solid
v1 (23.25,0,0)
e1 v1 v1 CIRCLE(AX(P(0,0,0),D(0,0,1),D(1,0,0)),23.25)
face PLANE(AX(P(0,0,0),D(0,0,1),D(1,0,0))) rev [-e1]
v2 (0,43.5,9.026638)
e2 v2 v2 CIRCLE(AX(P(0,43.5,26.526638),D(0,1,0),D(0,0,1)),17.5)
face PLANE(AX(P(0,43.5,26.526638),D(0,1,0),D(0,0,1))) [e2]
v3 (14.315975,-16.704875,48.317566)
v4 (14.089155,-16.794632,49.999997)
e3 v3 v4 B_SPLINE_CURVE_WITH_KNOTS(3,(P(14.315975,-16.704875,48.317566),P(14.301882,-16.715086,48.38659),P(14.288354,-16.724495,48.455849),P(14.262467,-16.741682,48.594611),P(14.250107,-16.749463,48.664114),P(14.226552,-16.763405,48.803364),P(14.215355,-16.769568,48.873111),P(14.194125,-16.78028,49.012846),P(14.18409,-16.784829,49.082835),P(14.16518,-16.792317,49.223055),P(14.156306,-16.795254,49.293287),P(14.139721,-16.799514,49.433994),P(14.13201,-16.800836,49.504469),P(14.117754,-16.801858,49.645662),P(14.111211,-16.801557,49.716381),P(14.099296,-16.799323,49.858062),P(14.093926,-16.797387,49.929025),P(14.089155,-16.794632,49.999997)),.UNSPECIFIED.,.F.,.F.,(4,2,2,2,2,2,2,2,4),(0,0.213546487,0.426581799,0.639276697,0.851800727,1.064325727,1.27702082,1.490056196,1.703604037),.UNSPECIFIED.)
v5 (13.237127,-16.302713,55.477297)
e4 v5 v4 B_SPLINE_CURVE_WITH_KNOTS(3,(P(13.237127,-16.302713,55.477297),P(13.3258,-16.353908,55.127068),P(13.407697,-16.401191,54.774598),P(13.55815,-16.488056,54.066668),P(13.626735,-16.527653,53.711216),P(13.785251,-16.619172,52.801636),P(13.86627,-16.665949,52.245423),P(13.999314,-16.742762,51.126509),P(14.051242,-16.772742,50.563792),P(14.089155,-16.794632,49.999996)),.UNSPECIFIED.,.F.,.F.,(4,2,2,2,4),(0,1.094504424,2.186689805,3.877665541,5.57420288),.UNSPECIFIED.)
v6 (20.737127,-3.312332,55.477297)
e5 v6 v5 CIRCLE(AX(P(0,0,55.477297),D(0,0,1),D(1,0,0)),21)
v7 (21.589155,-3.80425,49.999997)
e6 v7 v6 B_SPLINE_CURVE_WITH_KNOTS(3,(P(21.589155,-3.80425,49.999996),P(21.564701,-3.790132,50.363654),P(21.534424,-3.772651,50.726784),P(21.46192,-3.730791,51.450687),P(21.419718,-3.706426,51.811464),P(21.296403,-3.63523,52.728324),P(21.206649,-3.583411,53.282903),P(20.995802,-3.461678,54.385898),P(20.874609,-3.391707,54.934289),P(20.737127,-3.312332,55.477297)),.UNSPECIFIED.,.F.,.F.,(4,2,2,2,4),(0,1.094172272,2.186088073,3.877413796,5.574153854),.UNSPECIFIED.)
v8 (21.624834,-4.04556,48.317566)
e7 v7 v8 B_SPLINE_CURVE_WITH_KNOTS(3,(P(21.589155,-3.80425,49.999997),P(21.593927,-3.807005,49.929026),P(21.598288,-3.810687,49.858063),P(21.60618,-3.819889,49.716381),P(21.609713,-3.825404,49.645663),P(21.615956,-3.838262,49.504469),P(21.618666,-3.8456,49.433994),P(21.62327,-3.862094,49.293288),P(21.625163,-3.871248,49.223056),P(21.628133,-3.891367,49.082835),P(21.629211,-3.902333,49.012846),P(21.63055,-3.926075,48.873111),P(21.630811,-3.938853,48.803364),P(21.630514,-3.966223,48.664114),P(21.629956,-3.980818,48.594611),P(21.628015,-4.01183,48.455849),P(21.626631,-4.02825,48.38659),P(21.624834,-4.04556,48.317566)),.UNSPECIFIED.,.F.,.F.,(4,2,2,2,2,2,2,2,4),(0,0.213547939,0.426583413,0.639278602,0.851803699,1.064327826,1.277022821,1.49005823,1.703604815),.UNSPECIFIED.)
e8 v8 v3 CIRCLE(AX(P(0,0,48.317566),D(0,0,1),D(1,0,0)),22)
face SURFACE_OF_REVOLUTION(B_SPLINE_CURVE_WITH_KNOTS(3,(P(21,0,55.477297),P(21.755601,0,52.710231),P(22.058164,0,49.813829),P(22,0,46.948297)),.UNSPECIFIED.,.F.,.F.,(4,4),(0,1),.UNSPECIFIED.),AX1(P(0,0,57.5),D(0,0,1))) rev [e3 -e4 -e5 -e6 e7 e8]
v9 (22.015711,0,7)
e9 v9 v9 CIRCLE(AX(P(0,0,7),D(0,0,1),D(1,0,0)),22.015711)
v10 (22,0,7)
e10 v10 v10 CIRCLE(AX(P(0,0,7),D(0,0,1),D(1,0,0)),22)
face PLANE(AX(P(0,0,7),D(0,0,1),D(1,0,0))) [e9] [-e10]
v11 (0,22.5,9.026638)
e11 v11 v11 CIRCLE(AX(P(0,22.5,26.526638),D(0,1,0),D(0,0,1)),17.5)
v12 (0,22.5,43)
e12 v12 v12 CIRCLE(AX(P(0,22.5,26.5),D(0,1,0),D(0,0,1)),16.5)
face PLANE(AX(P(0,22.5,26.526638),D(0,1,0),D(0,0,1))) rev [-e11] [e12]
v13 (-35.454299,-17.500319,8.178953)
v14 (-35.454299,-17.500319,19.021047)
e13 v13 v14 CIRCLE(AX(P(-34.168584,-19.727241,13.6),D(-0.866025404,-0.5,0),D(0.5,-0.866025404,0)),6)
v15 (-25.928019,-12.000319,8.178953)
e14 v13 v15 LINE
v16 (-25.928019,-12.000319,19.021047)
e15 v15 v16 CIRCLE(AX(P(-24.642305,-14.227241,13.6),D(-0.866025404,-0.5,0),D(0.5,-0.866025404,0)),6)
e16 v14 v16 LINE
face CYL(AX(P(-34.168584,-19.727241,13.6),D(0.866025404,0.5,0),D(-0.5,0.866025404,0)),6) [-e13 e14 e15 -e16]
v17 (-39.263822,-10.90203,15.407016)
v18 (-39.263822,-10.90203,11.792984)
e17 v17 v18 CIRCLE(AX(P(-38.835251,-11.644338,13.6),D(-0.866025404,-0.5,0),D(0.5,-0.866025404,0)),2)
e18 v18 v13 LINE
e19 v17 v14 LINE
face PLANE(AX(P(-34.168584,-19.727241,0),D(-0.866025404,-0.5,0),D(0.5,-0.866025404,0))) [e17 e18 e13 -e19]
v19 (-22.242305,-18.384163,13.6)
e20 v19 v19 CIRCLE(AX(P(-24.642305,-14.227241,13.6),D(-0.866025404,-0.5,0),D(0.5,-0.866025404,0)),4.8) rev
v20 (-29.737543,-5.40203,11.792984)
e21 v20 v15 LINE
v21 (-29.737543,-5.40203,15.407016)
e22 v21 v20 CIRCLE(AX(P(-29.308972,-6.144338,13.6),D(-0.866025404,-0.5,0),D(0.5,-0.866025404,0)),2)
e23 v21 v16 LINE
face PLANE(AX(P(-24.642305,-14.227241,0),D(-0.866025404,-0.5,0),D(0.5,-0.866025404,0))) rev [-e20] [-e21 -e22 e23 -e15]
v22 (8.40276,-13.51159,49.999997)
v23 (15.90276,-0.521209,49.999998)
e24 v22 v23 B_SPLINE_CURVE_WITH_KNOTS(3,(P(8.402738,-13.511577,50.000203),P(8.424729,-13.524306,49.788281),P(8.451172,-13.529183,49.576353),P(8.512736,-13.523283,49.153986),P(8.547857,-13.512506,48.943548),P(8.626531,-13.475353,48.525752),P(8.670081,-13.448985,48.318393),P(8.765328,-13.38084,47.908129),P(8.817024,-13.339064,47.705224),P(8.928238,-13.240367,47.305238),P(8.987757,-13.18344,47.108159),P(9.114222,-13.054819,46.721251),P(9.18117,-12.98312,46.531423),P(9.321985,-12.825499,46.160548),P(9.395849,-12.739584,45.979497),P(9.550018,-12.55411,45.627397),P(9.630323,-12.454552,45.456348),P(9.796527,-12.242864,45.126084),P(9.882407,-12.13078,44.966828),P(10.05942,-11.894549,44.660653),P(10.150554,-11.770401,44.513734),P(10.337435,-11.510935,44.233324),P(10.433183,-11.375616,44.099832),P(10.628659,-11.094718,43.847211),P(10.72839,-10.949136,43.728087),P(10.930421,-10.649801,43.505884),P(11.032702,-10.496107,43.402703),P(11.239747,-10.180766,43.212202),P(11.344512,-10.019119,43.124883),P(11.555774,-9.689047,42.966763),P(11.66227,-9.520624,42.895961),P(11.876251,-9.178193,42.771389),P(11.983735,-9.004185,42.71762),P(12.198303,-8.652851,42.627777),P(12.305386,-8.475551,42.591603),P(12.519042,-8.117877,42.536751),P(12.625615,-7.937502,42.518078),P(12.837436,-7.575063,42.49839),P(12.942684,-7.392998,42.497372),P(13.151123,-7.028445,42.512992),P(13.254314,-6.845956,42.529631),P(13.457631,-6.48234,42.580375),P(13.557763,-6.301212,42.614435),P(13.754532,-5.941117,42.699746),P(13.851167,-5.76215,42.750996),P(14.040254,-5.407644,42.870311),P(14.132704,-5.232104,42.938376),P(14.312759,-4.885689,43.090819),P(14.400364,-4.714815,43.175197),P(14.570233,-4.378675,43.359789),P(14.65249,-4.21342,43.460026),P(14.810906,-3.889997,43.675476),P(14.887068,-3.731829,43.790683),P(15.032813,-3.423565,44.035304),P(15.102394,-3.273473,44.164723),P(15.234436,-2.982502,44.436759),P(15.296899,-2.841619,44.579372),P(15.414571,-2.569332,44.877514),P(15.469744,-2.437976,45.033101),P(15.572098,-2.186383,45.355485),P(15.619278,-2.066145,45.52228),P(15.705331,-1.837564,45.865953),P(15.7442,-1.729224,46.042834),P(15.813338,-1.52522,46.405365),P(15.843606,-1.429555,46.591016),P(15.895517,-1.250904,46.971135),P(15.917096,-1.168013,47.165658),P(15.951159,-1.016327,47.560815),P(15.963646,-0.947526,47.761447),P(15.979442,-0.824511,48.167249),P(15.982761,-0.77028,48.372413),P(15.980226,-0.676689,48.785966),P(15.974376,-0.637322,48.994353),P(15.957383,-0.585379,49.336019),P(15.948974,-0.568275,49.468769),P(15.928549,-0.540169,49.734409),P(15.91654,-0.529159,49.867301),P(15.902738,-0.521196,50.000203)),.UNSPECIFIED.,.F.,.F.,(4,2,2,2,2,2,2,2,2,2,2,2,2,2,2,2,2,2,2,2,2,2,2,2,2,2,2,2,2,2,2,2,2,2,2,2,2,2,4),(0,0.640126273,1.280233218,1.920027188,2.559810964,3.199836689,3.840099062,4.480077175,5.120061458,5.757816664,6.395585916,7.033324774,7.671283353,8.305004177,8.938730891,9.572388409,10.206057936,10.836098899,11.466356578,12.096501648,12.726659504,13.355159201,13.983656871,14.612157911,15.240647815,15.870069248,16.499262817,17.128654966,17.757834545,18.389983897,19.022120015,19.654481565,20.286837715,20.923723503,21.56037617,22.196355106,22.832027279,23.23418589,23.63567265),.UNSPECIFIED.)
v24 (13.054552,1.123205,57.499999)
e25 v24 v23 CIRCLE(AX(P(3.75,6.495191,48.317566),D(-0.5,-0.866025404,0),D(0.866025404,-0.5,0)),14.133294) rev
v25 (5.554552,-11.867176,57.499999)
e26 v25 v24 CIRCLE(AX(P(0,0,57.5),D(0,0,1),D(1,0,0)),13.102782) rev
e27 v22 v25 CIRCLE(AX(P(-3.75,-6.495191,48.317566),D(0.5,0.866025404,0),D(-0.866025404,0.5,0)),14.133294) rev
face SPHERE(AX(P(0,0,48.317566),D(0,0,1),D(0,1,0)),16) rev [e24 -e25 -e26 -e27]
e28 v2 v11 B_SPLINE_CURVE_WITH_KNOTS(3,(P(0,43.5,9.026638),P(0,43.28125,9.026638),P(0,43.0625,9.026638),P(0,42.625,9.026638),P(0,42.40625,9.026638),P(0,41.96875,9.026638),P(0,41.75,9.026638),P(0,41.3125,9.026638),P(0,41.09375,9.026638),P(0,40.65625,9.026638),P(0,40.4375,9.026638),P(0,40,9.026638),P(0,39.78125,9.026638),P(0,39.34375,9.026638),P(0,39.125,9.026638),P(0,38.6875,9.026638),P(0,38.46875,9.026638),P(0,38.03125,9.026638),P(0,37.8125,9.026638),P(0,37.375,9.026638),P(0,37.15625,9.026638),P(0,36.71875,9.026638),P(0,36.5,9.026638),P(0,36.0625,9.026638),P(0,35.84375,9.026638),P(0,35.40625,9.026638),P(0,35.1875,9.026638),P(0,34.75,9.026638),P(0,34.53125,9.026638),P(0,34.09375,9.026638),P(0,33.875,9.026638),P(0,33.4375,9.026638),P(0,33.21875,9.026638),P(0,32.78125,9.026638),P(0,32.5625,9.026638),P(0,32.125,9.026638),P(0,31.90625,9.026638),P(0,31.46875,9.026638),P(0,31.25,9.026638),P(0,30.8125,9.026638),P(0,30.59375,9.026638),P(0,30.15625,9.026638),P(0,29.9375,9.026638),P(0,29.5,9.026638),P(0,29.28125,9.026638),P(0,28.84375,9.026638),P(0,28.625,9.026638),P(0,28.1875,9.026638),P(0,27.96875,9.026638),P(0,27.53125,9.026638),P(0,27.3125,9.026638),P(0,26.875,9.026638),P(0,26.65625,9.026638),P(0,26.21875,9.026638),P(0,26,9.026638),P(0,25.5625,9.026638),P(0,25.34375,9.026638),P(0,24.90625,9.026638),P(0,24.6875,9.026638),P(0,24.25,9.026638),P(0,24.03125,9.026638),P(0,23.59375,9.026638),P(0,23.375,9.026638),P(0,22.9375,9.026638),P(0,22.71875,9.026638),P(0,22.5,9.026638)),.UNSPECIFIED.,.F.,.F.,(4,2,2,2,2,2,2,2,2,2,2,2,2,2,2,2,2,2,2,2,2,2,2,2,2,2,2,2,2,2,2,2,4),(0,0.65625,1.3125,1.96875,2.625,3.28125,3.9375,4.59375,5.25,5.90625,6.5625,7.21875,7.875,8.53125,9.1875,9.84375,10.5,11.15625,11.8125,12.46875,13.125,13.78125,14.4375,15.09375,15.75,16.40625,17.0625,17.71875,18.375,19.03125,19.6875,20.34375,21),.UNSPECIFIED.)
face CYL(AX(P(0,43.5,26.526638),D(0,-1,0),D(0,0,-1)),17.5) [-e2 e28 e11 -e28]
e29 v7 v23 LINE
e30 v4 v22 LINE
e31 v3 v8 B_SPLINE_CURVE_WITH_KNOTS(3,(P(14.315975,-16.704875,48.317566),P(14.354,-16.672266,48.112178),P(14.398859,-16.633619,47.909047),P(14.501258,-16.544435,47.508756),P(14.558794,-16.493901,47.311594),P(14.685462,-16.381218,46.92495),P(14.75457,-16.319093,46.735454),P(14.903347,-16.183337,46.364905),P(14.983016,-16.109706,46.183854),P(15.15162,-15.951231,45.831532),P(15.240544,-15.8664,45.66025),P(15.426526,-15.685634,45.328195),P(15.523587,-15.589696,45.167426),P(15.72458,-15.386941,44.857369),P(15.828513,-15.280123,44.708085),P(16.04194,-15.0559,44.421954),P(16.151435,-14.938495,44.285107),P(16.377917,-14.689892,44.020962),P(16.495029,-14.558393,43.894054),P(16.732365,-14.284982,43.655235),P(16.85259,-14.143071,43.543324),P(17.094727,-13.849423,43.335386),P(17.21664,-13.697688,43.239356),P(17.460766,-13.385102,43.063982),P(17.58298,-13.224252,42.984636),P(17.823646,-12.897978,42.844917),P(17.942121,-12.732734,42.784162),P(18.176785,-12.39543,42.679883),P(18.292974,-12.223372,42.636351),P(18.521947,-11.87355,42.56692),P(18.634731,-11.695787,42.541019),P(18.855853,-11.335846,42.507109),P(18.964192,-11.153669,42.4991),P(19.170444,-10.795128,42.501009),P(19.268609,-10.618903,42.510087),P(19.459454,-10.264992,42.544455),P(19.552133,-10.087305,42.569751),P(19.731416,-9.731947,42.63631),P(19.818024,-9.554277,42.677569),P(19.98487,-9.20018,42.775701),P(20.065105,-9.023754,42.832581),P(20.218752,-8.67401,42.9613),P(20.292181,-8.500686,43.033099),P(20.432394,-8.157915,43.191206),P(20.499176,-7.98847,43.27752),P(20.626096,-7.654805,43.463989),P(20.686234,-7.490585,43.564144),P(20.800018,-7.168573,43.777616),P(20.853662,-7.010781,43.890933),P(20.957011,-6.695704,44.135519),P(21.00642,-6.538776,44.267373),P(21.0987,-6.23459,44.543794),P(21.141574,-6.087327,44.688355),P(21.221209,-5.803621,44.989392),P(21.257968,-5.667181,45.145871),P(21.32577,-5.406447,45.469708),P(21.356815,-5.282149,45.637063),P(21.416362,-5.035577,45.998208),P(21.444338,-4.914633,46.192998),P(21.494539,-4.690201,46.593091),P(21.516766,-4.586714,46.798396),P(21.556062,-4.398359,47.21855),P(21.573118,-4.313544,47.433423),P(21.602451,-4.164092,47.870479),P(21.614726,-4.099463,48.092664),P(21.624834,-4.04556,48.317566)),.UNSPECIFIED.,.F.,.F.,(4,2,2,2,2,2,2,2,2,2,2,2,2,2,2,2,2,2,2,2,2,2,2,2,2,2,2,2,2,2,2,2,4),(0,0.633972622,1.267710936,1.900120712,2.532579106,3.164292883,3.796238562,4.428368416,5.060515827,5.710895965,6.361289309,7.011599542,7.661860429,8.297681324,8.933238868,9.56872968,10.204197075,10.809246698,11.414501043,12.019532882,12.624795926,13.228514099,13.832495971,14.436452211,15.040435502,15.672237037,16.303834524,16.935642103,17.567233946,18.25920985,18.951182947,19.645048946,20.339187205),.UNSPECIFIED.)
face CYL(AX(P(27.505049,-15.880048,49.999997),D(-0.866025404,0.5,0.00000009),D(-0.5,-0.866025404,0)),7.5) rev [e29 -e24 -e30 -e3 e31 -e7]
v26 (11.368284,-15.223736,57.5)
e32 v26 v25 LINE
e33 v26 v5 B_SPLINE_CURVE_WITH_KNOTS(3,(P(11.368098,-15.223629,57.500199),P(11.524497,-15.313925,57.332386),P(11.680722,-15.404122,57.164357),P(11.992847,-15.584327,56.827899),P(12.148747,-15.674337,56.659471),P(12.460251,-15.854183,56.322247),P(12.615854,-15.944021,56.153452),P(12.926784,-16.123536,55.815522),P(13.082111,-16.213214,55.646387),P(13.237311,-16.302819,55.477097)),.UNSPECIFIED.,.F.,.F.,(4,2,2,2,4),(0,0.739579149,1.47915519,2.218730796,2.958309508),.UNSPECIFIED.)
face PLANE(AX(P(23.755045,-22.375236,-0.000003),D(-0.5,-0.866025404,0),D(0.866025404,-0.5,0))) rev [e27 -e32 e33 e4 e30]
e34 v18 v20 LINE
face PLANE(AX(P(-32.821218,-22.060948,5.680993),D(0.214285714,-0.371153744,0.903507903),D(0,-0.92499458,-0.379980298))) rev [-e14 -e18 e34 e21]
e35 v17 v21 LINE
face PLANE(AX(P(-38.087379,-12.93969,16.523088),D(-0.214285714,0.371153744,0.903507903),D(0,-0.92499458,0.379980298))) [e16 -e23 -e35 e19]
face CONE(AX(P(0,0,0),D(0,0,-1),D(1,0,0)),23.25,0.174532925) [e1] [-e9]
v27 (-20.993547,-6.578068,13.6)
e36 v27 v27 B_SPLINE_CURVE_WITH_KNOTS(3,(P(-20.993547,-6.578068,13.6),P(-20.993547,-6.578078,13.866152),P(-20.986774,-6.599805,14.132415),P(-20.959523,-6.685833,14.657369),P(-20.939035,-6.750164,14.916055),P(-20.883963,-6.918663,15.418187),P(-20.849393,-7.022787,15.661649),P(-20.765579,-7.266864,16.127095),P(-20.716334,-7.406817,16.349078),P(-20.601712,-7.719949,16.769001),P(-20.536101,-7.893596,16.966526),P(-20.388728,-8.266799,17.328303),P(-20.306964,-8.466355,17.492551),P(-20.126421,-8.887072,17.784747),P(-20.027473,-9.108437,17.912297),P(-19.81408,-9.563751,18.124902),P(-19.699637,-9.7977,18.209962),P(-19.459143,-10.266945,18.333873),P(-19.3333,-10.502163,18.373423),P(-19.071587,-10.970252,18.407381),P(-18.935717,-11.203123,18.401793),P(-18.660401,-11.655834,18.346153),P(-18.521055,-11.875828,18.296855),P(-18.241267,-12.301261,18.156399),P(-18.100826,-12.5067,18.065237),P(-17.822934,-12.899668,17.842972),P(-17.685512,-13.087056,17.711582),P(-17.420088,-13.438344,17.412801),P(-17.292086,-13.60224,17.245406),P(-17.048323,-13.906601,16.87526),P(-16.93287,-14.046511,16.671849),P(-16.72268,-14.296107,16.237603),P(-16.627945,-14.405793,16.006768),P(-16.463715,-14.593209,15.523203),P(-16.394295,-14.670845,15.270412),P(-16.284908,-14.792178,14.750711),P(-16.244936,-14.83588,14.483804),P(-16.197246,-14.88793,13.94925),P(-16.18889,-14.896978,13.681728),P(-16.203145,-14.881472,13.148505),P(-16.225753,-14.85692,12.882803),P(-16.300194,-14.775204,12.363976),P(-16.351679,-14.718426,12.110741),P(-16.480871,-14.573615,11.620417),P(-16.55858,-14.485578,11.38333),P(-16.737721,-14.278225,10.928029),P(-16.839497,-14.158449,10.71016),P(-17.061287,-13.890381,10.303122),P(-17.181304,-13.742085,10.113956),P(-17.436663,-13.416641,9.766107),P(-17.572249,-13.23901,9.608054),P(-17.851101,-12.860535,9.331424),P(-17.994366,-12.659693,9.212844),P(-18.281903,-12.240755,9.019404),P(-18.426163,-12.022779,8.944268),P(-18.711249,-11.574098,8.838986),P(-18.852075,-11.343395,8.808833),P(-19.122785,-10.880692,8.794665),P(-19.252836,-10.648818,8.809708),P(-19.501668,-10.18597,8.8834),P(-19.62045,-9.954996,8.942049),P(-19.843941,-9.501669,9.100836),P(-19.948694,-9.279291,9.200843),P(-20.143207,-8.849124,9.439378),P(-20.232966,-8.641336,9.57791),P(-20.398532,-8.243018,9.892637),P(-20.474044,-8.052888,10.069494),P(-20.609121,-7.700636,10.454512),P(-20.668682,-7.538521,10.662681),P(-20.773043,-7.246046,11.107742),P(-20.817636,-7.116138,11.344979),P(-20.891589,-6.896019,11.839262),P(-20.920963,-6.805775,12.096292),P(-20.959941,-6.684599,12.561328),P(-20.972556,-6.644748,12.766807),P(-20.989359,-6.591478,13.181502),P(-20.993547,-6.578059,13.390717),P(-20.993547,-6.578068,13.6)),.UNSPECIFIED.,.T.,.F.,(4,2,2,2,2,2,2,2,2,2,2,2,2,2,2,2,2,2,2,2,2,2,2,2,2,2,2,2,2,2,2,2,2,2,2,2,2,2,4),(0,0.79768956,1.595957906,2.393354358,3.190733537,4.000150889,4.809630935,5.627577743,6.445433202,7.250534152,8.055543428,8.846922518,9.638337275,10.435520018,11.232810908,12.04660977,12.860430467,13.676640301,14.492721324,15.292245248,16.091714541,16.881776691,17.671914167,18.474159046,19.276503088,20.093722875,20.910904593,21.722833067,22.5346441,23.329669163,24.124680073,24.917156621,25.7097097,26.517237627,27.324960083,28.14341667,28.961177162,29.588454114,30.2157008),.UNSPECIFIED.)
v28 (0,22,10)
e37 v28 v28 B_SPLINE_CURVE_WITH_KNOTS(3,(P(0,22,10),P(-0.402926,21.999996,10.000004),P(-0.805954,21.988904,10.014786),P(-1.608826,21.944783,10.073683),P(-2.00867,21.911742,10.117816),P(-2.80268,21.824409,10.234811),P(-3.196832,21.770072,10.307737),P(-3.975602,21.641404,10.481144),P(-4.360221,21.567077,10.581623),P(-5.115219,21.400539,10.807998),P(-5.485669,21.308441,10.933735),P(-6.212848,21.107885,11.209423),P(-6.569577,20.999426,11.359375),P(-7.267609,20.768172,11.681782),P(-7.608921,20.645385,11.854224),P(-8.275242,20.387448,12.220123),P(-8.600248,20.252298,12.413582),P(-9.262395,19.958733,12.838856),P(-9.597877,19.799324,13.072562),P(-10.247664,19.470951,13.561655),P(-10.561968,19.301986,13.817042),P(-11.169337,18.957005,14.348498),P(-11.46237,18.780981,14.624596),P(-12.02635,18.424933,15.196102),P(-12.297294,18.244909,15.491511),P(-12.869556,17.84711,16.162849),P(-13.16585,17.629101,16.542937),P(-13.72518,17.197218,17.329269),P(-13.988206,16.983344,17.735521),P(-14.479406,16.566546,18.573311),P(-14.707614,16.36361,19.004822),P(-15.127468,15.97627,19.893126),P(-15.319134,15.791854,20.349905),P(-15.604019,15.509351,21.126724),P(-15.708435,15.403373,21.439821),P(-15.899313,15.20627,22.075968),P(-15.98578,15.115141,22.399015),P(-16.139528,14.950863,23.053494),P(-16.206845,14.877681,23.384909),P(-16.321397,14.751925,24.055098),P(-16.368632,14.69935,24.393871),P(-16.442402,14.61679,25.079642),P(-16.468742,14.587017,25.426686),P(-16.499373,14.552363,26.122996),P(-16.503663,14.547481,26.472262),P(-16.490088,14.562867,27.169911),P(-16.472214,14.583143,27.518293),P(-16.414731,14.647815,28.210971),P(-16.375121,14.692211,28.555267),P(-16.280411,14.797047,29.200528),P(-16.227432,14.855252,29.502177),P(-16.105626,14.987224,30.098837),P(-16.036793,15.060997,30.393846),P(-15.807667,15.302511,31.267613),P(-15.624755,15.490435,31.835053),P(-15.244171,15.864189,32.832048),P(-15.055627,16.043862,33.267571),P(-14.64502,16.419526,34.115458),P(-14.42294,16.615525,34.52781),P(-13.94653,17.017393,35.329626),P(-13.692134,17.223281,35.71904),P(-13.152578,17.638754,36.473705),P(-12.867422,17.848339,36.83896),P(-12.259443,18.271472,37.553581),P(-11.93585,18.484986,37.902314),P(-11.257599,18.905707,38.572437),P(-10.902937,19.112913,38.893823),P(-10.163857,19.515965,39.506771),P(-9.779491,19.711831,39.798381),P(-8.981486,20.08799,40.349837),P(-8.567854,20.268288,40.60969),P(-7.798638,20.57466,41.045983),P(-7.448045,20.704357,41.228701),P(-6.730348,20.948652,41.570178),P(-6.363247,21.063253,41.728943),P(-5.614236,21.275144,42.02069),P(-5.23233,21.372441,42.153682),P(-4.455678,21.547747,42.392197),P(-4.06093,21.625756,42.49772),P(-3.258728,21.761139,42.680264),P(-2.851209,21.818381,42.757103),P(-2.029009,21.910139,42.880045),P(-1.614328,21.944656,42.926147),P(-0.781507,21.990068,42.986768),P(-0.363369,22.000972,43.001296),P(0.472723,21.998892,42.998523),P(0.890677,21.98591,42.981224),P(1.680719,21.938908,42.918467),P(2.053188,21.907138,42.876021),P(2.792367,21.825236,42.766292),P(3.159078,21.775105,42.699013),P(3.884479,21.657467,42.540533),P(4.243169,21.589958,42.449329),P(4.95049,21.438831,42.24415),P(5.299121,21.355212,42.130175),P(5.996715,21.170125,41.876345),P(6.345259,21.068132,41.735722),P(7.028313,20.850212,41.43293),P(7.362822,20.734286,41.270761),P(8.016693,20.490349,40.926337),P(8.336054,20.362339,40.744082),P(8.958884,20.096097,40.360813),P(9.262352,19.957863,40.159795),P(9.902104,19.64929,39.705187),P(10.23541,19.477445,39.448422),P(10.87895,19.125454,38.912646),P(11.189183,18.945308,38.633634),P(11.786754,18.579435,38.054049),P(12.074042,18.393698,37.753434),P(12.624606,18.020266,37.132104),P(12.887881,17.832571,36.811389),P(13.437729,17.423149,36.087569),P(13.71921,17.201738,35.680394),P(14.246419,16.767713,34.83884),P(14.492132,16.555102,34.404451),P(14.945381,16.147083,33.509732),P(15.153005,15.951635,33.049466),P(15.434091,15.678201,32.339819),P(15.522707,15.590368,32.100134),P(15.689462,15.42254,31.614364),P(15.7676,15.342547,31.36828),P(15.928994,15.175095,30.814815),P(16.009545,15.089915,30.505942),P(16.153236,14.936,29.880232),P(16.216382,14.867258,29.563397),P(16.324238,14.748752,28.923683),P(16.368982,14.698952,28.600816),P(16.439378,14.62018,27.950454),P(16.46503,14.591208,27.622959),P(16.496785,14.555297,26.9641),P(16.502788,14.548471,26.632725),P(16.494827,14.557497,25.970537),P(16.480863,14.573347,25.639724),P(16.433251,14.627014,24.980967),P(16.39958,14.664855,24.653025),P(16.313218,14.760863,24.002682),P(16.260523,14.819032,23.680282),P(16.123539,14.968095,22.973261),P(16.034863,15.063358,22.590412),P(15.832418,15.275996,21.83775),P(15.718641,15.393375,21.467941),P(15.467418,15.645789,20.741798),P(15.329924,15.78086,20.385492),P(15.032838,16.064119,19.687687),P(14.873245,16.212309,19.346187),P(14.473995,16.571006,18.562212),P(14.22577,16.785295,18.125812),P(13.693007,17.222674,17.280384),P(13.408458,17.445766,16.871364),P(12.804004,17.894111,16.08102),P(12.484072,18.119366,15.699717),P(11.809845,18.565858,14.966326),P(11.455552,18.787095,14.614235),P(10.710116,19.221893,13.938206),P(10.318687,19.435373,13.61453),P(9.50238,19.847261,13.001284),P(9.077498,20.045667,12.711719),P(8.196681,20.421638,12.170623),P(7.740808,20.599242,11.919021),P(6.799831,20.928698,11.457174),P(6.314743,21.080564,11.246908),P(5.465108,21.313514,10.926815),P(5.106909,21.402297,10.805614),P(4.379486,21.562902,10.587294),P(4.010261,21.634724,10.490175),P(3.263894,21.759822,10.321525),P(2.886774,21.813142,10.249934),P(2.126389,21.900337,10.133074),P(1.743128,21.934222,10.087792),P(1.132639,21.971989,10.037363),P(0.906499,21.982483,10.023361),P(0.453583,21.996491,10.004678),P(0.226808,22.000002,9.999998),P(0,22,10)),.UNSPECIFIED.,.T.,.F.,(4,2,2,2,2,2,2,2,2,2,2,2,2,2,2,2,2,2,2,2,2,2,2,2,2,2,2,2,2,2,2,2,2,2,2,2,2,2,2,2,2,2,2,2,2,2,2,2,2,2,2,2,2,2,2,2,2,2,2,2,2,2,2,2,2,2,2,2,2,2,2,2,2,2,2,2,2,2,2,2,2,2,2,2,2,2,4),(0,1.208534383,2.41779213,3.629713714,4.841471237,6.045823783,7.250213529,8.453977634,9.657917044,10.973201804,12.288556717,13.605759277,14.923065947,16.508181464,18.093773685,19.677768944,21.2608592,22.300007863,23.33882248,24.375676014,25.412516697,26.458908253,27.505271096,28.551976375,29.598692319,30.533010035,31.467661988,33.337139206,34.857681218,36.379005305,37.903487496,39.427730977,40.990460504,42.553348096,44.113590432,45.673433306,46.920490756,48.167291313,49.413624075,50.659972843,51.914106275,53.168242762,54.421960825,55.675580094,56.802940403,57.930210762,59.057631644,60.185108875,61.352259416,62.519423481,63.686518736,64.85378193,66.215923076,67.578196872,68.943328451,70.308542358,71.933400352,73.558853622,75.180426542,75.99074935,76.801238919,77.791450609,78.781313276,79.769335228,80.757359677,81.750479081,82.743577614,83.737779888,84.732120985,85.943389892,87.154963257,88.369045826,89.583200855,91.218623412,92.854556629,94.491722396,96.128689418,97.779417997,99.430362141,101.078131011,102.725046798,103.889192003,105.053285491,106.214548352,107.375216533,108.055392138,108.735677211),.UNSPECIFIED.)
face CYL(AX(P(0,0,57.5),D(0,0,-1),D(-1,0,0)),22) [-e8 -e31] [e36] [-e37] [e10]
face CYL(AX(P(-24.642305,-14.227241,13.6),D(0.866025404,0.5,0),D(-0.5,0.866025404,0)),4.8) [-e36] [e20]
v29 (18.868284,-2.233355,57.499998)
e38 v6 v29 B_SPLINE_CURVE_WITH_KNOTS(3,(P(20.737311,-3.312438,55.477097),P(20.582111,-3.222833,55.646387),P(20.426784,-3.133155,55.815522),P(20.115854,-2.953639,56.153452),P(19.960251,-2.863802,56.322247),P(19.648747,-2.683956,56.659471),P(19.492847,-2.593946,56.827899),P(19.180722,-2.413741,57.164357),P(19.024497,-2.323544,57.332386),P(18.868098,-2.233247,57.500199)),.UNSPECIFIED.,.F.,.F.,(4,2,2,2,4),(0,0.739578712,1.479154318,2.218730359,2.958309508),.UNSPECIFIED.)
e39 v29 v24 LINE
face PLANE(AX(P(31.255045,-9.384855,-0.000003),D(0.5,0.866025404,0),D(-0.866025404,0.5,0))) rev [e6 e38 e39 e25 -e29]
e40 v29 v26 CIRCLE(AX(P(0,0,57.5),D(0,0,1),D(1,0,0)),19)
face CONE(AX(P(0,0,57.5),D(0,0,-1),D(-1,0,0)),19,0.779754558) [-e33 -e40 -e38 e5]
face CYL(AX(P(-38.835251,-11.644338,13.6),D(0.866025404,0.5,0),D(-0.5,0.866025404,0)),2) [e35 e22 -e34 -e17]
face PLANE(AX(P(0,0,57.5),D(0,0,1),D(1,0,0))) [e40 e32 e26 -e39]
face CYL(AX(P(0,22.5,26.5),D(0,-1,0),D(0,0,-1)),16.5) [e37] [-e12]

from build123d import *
from OCP.BRepAlgoAPI import BRepAlgoAPI_Cut
from OCP.TopTools import TopTools_ListOfShape

# Parameters (mm, degrees)
SKETCH_1_R          = 23.25
EXTRUDE_1_DEPTH     = 7
EXTRUDE_1_TAPER     = 10
SKETCH_2_R          = 22
EXTRUDE_2_DEPTH     = 50.5
SKETCH_4_R          = 16.5
EXTRUDE_3_DEPTH     = 22.5
SKETCH_6_R          = 17.5
EXTRUDE_4_DEPTH     = 21
CUT_EXTRUDE_START   = -5.710511326
CUT_EXTRUDE_1_DEPTH = 12.710511326
SKETCH_10_R         = 4.8
EXTRUDE_5_DEPTH     = 12
EXTRUDE_6_DEPTH     = 11


with BuildPart() as part:
    # 草图1 → 凸台-拉伸1 (new body)
    with BuildSketch(Plane.XY):
        Circle(SKETCH_1_R)
    extrude(amount=EXTRUDE_1_DEPTH, taper=EXTRUDE_1_TAPER)

    # 草图2 → 凸台-拉伸2 (add)
    with BuildSketch(Plane.XY.offset(7)):
        Circle(SKETCH_2_R)
    extrude(amount=EXTRUDE_2_DEPTH)

    # 草图3 → 切除-旋转1 (revolve, cut)
    with BuildSketch(Plane(origin=(0, 0, 0), x_dir=(1, 0, 0), z_dir=(0, 1, 0))):
        with BuildLine():
            Line((21, -55.477297211), (22, -55.477297211))
            Line((22, -55.477297211), (22, -48.317565939))
            add(Edge.make_bspline(
                [(21, -55.477297211), (21.635397746, -53.150423877), (21.950433845, -50.732091094), (22, -48.317565939)],
                knots=[0, 0, 0, 0, 0.840917251, 0.840917251, 0.840917251, 0.840917251], degree=3))
        make_face()
        Polygon((19, -57.5), (22, -57.5), (22, -55.477297211), (21, -55.477297211), align=None)
    revolve(axis=Axis((0, 0, 57.5), (0, 0, -1)), mode=Mode.SUBTRACT)

    # 草图4 → 凸台-拉伸3 (add)
    with BuildSketch(Plane(origin=(0, 0, 0), x_dir=(1, 0, 0), z_dir=(0, 1, 0))):
        with Locations(Location((0, -26.5, 0), (0, 0, 90))):
            Circle(SKETCH_4_R)
    extrude(amount=EXTRUDE_3_DEPTH)

    # 草图6 → 凸台-拉伸4 (add)
    with BuildSketch(Plane(origin=(0, 22.5, 0), x_dir=(1, 0, 0), z_dir=(0, 1, 0))):
        with Locations(Location((0, -26.526637771, 0), (0, 0, 90))):
            Circle(SKETCH_6_R)
    extrude(amount=EXTRUDE_4_DEPTH)

    # 草图7 → 切除-旋转2 (revolve, cut)
    with BuildSketch(Plane(origin=(0, 0, 0), x_dir=(0, 0, -1), z_dir=(1, 0, 0))):
        with BuildLine():
            Line((-64.317565939, 0), (-32.317565939, 0))
            ThreePointArc((-32.317565939, 0), (-48.317565939, 16), (-64.317565939, 0))
        make_face()
    revolve(axis=Axis((0, 0, 57.5), (0, 0, -1)), mode=Mode.SUBTRACT)


with BuildPart() as cut_extrude_1_tool:
    # 切除-拉伸1: read off the stored shape, not the designer's step
    # 切除-拉伸1 outline → 切除-拉伸1 (new body)
    with BuildSketch(Plane(origin=(14.249995527, -8.227238754, -1.478e-06), x_dir=(0.49999999999999495, 0.8660254037844416, 0), z_dir=(0.8660254037844382, -0.49999999999999295, -8.981993465039313e-08)).offset(CUT_EXTRUDE_START)):
        with BuildLine():
            ThreePointArc((-7.5, 49.99999845), (3.87e-07, 42.5), (7.5, 49.999999225))
            Line((7.5, 49.999999225), (7.5, 57.5))
            Line((7.5, 57.5), (-7.5, 57.499999177))
            Line((-7.5, 57.499999177), (-7.5, 49.99999845))
        make_face()
    extrude(amount=CUT_EXTRUDE_1_DEPTH)


with BuildPart() as part_1:
    add(part.part)

    # 切除-拉伸1: cut by cut_extrude_1_tool, with a tolerance
    cut_extrude_1_stock = TopTools_ListOfShape()
    cut_extrude_1_stock.Append(part_1.part.wrapped)
    cut_extrude_1_tools = TopTools_ListOfShape()
    cut_extrude_1_tools.Append(cut_extrude_1_tool.part.wrapped)
    cut_extrude_1_cut = BRepAlgoAPI_Cut()
    cut_extrude_1_cut.SetArguments(cut_extrude_1_stock)
    cut_extrude_1_cut.SetTools(cut_extrude_1_tools)
    cut_extrude_1_cut.SetFuzzyValue(0.00001)
    cut_extrude_1_cut.Build()
    add(Compound.cast(cut_extrude_1_cut.Shape()).solids(), mode=Mode.REPLACE)

    # 草图10 → 凸台-拉伸5 (add)
    with BuildSketch(Plane(origin=(-14.25, -8.227241336, 0), x_dir=(0.500000000000007, -0.8660254037844346, 0), z_dir=(0.8660254037844346, 0.500000000000007, 0))):
        with Locations(Location((0, -13.6, 0), (0, 0, 180))):
            Circle(SKETCH_10_R)
    extrude(amount=-EXTRUDE_5_DEPTH)

    # 草图11 → 凸台-拉伸6 (add)
    with BuildSketch(Plane(origin=(-24.642304845, -14.227241336, 0), x_dir=(0, 0, 1), z_dir=(-0.8660254037844347, -0.500000000000007, 0))):
        with BuildLine():
            ThreePointArc((19.6, 0), (19.453472666, 1.31789899), (19.021047417, 2.571428571))
            ThreePointArc((19.021047417, 2.571428571), (16.807134903, 5.070925528), (13.6, 6))
            Line((13.6, 6), (13.6, 4.8))
            ThreePointArc((13.6, 4.8), (16.99411255, 3.39411255), (18.4, 0))
            ThreePointArc((18.4, 0), (16.99411255, -3.39411255), (13.6, -4.8))
            Line((13.6, -4.8), (13.6, -6))
            ThreePointArc((13.6, -6), (17.842640687, -4.242640687), (19.6, 0))
        make_face()
        with BuildLine():
            Line((13.6, 4.8), (13.6, 6))
            ThreePointArc((13.6, 6), (10.392865097, 5.070925528), (8.178952583, 2.571428571))
            ThreePointArc((8.178952583, 2.571428571), (8.529074472, -3.207134903), (13.6, -6))
            Line((13.6, -6), (13.6, -4.8))
            ThreePointArc((13.6, -4.8), (8.8, 0), (13.6, 4.8))
        make_face()
        with BuildLine():
            Line((19.021047417, 2.571428571), (15.407015806, 10.19047619))
            ThreePointArc((15.407015806, 10.19047619), (14.669044968, 11.023641843), (13.6, 11.333333333))
            Line((13.6, 11.333333333), (13.6, 6))
            ThreePointArc((13.6, 6), (16.807134903, 5.070925528), (19.021047417, 2.571428571))
        make_face()
        with BuildLine():
            Line((13.6, 6), (13.6, 11.333333333))
            ThreePointArc((13.6, 11.333333333), (12.530955032, 11.023641843), (11.792984194, 10.19047619))
            Line((11.792984194, 10.19047619), (8.178952583, 2.571428571))
            ThreePointArc((8.178952583, 2.571428571), (10.392865097, 5.070925528), (13.6, 6))
        make_face()
        with BuildLine():
            ThreePointArc((18.4, 0), (16.99411255, 3.39411255), (13.6, 4.8))
            Line((13.6, 4.8), (13.6, -4.8))
            ThreePointArc((13.6, -4.8), (16.99411255, -3.39411255), (18.4, 0))
        make_face()
        with BuildLine():
            Line((13.6, -4.8), (13.6, 4.8))
            ThreePointArc((13.6, 4.8), (8.8, 0), (13.6, -4.8))
        make_face()
    extrude(amount=EXTRUDE_6_DEPTH)


solid = part_1.part
